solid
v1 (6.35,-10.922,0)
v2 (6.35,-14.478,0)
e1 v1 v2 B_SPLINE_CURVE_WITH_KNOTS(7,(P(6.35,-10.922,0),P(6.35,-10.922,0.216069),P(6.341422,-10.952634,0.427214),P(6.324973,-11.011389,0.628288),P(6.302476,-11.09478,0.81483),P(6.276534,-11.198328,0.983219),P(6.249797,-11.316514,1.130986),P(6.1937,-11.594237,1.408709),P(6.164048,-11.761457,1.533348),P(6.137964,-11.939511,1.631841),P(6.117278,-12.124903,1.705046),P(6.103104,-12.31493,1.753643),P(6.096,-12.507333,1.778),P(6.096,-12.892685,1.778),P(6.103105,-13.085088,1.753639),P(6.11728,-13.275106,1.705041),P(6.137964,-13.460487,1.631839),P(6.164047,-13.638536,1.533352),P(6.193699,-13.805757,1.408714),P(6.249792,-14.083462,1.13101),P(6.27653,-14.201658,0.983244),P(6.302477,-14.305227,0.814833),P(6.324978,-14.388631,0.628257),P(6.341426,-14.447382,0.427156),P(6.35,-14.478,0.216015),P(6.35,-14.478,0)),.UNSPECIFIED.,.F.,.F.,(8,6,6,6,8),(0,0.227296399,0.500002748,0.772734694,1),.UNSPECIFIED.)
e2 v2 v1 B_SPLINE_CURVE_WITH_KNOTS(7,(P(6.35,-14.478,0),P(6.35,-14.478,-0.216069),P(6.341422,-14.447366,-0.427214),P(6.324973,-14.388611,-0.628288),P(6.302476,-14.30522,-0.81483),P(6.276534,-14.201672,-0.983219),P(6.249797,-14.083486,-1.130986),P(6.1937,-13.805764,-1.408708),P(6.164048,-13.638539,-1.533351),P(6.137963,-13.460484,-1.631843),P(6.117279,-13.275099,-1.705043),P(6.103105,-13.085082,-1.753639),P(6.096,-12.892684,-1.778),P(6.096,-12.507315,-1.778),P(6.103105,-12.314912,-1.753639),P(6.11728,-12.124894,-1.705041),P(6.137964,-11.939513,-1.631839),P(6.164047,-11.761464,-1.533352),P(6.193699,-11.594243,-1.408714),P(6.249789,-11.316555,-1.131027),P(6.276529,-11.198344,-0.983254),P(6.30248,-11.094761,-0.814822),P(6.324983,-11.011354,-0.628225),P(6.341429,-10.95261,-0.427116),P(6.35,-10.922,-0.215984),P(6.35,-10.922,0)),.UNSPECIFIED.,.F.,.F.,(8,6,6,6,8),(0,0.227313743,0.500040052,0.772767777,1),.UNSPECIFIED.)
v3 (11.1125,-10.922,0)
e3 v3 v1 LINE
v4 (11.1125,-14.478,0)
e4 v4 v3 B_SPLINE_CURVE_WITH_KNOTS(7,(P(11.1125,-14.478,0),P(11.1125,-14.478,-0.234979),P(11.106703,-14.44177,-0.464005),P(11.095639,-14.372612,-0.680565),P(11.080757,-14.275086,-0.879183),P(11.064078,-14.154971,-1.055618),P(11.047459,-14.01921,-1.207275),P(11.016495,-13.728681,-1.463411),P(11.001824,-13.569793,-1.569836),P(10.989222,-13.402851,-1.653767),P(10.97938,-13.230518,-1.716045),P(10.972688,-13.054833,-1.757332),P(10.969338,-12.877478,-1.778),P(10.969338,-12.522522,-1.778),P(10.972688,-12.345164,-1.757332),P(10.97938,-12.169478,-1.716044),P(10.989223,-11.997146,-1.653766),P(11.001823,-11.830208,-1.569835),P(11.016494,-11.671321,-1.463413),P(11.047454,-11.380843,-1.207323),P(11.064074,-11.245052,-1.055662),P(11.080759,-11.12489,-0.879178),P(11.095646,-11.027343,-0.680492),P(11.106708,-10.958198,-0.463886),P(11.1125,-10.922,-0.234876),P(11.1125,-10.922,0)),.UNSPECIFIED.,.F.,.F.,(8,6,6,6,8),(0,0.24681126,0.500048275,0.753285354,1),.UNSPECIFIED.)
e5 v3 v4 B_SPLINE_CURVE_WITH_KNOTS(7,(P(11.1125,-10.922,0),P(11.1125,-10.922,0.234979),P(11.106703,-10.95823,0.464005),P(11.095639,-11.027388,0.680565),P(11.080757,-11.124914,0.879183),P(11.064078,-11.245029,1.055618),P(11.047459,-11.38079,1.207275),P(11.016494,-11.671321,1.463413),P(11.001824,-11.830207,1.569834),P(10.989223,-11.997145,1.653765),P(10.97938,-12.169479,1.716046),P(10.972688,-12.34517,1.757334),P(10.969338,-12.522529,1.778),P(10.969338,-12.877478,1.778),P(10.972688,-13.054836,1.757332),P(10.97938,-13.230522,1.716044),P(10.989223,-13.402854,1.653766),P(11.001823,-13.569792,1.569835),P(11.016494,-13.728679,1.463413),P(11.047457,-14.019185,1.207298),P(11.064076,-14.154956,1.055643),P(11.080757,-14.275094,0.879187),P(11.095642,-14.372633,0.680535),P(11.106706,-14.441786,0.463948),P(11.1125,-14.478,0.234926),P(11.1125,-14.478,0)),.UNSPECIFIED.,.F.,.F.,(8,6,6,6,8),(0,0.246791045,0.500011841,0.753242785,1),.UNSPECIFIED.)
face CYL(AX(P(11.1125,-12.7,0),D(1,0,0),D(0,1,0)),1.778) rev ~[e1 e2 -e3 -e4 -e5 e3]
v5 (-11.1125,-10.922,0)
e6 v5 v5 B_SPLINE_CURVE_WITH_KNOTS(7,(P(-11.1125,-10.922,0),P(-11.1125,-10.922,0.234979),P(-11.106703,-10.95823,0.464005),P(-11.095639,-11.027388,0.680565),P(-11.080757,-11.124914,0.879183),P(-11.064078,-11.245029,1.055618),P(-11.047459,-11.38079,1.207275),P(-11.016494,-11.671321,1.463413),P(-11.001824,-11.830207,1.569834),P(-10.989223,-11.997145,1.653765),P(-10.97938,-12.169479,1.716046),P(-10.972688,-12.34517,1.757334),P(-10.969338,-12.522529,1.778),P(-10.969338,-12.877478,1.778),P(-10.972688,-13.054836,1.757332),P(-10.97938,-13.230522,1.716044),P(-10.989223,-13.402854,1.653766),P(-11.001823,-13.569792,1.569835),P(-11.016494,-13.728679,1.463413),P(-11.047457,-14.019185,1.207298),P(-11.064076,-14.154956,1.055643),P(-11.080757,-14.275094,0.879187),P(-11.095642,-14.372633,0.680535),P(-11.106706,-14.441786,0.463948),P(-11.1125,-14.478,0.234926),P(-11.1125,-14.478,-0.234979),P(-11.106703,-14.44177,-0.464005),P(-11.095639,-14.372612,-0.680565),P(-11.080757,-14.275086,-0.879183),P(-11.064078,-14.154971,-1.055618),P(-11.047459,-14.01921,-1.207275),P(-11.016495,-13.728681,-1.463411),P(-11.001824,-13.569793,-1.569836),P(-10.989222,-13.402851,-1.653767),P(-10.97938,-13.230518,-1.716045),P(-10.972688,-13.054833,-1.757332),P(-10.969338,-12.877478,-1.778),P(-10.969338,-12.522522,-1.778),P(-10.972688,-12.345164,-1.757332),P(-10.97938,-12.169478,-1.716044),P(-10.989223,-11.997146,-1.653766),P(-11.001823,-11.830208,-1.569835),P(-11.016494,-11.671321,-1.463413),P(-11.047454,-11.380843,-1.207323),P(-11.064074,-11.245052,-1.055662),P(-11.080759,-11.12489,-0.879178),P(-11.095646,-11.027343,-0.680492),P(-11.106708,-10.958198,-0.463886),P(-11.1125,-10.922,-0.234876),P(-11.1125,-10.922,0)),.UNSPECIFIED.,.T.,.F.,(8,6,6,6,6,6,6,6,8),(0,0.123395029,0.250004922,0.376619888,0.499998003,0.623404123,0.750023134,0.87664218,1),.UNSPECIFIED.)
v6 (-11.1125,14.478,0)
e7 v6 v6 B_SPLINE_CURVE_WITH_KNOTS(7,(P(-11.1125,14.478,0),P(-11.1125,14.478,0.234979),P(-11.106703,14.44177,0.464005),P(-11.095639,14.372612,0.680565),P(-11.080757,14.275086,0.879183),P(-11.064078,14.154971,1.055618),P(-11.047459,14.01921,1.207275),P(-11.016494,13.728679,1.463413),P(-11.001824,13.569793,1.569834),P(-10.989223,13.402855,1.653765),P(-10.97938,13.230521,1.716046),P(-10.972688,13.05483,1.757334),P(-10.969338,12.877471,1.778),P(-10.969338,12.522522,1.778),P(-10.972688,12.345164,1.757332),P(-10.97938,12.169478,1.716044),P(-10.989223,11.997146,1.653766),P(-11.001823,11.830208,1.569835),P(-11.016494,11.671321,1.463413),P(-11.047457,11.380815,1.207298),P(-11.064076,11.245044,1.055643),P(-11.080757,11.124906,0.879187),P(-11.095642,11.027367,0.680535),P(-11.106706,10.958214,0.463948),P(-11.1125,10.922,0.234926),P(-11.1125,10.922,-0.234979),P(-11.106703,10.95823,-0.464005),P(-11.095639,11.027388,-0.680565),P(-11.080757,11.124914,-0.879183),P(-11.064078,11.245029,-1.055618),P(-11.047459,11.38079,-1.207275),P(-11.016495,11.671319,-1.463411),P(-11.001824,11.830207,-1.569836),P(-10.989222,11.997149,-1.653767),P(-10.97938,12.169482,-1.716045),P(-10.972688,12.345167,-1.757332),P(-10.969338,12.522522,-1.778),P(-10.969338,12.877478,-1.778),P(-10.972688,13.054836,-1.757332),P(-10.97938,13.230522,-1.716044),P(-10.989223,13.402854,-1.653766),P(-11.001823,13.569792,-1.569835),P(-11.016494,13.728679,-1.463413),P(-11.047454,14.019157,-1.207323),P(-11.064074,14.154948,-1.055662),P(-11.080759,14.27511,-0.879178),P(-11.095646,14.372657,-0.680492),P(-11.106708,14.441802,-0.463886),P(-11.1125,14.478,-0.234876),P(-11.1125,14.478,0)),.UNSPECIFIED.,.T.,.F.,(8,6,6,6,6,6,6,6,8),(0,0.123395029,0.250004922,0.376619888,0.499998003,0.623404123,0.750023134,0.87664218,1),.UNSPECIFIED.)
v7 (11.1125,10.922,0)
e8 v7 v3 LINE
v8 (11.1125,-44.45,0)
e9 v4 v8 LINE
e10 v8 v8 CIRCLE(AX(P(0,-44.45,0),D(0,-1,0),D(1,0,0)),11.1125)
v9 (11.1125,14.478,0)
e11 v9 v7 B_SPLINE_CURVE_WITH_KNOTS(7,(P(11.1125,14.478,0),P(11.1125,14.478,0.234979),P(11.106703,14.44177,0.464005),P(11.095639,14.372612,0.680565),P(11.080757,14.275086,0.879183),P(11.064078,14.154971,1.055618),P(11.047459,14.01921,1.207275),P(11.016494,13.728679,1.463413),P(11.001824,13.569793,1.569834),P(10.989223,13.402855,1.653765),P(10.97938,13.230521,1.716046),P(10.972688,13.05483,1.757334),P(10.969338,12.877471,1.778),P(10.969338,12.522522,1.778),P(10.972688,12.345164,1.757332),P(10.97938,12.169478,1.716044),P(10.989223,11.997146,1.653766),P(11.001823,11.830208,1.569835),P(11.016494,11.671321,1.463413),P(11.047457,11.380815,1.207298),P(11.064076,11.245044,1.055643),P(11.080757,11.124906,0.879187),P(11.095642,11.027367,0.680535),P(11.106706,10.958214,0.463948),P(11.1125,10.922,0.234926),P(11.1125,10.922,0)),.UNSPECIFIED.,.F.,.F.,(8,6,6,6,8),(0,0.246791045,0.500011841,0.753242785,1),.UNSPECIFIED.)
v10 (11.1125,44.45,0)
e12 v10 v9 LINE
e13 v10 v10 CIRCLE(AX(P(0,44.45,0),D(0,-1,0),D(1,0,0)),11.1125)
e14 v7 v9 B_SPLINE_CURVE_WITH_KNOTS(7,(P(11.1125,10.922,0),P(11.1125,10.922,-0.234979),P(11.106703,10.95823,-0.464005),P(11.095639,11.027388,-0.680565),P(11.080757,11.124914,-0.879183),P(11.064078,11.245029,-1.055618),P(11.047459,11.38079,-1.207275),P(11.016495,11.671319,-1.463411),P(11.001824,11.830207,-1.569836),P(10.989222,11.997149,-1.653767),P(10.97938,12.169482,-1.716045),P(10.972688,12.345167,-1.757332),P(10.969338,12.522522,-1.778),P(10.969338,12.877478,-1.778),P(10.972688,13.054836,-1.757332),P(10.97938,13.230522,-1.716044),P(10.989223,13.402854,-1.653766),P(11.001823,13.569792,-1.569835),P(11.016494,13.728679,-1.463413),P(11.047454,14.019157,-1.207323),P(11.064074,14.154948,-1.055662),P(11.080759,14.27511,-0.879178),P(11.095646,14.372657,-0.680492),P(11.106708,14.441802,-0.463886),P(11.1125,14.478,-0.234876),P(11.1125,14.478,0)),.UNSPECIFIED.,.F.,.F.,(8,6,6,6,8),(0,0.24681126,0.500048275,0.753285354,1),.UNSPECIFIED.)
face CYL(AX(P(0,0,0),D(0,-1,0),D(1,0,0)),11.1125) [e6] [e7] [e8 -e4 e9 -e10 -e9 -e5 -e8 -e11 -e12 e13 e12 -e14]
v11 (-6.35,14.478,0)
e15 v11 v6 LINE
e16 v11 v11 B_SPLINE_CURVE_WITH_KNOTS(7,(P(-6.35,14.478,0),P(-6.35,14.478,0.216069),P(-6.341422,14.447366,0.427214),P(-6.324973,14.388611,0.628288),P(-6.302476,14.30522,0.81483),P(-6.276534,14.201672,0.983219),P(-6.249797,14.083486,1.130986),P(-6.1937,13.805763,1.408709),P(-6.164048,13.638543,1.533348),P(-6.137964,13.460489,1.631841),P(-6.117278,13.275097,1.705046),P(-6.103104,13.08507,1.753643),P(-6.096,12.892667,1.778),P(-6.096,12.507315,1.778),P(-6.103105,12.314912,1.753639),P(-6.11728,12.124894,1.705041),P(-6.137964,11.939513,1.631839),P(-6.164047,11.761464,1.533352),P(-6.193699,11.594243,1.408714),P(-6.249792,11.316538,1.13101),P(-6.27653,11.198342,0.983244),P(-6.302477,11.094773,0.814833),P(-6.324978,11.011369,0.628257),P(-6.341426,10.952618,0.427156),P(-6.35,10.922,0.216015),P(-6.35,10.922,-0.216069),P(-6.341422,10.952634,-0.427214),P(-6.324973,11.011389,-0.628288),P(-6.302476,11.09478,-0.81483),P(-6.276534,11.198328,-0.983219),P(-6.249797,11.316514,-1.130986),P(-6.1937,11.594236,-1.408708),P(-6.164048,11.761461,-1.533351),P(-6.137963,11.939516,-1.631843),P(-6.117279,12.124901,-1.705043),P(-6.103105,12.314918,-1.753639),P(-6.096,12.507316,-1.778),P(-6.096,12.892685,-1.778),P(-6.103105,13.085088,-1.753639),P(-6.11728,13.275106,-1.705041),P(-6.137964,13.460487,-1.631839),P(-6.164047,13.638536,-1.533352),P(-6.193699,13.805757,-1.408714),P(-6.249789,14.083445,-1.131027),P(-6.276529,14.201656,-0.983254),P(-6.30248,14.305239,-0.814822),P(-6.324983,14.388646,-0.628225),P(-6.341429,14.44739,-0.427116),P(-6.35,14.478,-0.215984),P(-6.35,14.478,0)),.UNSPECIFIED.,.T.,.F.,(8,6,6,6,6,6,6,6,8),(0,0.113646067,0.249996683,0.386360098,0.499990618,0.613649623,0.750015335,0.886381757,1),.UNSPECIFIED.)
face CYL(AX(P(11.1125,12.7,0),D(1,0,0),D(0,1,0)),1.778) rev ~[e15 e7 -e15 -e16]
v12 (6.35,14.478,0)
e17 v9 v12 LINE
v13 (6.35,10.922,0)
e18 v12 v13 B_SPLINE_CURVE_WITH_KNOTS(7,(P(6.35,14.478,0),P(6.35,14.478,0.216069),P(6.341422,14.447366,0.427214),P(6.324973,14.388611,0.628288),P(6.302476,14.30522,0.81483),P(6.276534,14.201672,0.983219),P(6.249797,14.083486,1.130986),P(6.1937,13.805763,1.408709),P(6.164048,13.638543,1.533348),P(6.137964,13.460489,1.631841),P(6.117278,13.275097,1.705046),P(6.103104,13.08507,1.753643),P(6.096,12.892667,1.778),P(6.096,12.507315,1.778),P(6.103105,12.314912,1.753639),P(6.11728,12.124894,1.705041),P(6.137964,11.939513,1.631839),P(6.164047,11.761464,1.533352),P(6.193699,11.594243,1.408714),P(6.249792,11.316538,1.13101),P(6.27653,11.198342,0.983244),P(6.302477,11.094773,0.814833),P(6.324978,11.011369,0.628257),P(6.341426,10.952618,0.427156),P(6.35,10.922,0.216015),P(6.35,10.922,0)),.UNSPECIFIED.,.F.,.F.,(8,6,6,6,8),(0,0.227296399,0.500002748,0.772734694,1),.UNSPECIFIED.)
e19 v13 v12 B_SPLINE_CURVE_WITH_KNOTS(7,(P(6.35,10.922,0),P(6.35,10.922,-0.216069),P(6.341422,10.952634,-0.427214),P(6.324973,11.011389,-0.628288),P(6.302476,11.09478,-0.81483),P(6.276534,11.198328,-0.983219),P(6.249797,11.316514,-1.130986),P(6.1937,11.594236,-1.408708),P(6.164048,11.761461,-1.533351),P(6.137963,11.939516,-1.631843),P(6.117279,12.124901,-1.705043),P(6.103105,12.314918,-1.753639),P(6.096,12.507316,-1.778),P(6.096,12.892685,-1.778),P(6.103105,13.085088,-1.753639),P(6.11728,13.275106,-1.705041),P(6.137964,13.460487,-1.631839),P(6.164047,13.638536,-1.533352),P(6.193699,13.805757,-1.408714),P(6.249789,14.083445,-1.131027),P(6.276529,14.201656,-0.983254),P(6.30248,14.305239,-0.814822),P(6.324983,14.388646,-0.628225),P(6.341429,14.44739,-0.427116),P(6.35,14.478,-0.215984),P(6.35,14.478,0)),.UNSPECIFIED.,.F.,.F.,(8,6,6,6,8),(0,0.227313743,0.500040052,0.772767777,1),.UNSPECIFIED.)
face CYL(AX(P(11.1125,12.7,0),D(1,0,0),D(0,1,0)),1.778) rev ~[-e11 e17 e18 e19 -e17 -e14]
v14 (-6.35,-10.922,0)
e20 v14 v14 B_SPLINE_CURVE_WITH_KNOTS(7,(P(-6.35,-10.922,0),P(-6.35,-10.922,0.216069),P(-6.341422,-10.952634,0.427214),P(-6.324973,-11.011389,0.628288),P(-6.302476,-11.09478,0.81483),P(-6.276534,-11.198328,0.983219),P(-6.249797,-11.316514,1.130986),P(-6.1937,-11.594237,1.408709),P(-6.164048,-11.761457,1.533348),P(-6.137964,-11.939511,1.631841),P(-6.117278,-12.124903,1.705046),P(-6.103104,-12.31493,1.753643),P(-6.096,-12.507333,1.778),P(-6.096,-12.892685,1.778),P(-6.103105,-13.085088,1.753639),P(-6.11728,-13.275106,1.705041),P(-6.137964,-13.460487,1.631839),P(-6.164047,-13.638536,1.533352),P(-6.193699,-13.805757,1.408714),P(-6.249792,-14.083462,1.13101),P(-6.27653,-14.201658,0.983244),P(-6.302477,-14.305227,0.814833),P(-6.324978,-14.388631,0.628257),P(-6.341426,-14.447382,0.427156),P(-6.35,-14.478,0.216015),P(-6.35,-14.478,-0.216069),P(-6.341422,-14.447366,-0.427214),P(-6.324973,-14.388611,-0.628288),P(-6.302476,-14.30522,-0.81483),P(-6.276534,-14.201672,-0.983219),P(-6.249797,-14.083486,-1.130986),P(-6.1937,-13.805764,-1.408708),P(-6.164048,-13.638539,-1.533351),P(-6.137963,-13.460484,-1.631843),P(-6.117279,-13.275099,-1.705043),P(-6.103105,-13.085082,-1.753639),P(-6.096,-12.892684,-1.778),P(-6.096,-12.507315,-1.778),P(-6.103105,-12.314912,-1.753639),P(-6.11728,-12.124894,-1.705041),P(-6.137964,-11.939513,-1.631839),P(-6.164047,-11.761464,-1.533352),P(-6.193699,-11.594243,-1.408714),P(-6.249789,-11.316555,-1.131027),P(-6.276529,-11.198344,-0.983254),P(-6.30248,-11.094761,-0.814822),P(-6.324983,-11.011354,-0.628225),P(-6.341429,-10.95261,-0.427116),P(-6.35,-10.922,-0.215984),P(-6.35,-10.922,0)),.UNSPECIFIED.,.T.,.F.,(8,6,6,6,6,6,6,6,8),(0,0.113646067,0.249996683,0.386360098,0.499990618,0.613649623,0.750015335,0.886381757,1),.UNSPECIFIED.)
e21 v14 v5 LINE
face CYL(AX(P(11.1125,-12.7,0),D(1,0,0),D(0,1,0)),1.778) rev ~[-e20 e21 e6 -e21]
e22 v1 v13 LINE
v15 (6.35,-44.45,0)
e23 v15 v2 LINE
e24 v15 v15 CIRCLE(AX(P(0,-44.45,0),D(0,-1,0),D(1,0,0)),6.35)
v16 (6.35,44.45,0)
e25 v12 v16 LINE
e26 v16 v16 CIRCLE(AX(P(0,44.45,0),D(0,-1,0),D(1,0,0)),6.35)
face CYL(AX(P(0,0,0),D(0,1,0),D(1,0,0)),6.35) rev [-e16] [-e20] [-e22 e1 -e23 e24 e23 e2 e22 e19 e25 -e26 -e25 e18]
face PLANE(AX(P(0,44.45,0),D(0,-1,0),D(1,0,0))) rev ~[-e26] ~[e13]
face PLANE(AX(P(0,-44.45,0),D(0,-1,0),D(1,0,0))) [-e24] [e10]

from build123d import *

# Parameters (mm, degrees)
F0_R     = 11.1125
F0_R_2   = 6.35
F1_DEPTH = 44.45
F3_R     = 1.778
F4_DEPTH = 22.226


# Not quite as in the source:
# - a length typed as a fraction of an inch, garbled in the dataset ("3 / 203.2 mm" for 3/8 in), is restored


with BuildPart() as f1:
    # F0 (on Front) → F1 (new body, symmetric)
    with BuildSketch(Plane.XZ):
        Circle(F0_R)
        Circle(F0_R_2, mode=Mode.SUBTRACT)
    extrude(amount=F1_DEPTH, both=True)

    # F3 (on offset) → F4 (cut, through all)
    with BuildSketch(Plane.YZ.offset(11.1125)):
        with Locations((-12.7, 0)):
            Circle(F3_R)
        with Locations((12.7, 0)):
            Circle(F3_R)
    extrude(amount=-F4_DEPTH, mode=Mode.SUBTRACT)


solid = f1.part
